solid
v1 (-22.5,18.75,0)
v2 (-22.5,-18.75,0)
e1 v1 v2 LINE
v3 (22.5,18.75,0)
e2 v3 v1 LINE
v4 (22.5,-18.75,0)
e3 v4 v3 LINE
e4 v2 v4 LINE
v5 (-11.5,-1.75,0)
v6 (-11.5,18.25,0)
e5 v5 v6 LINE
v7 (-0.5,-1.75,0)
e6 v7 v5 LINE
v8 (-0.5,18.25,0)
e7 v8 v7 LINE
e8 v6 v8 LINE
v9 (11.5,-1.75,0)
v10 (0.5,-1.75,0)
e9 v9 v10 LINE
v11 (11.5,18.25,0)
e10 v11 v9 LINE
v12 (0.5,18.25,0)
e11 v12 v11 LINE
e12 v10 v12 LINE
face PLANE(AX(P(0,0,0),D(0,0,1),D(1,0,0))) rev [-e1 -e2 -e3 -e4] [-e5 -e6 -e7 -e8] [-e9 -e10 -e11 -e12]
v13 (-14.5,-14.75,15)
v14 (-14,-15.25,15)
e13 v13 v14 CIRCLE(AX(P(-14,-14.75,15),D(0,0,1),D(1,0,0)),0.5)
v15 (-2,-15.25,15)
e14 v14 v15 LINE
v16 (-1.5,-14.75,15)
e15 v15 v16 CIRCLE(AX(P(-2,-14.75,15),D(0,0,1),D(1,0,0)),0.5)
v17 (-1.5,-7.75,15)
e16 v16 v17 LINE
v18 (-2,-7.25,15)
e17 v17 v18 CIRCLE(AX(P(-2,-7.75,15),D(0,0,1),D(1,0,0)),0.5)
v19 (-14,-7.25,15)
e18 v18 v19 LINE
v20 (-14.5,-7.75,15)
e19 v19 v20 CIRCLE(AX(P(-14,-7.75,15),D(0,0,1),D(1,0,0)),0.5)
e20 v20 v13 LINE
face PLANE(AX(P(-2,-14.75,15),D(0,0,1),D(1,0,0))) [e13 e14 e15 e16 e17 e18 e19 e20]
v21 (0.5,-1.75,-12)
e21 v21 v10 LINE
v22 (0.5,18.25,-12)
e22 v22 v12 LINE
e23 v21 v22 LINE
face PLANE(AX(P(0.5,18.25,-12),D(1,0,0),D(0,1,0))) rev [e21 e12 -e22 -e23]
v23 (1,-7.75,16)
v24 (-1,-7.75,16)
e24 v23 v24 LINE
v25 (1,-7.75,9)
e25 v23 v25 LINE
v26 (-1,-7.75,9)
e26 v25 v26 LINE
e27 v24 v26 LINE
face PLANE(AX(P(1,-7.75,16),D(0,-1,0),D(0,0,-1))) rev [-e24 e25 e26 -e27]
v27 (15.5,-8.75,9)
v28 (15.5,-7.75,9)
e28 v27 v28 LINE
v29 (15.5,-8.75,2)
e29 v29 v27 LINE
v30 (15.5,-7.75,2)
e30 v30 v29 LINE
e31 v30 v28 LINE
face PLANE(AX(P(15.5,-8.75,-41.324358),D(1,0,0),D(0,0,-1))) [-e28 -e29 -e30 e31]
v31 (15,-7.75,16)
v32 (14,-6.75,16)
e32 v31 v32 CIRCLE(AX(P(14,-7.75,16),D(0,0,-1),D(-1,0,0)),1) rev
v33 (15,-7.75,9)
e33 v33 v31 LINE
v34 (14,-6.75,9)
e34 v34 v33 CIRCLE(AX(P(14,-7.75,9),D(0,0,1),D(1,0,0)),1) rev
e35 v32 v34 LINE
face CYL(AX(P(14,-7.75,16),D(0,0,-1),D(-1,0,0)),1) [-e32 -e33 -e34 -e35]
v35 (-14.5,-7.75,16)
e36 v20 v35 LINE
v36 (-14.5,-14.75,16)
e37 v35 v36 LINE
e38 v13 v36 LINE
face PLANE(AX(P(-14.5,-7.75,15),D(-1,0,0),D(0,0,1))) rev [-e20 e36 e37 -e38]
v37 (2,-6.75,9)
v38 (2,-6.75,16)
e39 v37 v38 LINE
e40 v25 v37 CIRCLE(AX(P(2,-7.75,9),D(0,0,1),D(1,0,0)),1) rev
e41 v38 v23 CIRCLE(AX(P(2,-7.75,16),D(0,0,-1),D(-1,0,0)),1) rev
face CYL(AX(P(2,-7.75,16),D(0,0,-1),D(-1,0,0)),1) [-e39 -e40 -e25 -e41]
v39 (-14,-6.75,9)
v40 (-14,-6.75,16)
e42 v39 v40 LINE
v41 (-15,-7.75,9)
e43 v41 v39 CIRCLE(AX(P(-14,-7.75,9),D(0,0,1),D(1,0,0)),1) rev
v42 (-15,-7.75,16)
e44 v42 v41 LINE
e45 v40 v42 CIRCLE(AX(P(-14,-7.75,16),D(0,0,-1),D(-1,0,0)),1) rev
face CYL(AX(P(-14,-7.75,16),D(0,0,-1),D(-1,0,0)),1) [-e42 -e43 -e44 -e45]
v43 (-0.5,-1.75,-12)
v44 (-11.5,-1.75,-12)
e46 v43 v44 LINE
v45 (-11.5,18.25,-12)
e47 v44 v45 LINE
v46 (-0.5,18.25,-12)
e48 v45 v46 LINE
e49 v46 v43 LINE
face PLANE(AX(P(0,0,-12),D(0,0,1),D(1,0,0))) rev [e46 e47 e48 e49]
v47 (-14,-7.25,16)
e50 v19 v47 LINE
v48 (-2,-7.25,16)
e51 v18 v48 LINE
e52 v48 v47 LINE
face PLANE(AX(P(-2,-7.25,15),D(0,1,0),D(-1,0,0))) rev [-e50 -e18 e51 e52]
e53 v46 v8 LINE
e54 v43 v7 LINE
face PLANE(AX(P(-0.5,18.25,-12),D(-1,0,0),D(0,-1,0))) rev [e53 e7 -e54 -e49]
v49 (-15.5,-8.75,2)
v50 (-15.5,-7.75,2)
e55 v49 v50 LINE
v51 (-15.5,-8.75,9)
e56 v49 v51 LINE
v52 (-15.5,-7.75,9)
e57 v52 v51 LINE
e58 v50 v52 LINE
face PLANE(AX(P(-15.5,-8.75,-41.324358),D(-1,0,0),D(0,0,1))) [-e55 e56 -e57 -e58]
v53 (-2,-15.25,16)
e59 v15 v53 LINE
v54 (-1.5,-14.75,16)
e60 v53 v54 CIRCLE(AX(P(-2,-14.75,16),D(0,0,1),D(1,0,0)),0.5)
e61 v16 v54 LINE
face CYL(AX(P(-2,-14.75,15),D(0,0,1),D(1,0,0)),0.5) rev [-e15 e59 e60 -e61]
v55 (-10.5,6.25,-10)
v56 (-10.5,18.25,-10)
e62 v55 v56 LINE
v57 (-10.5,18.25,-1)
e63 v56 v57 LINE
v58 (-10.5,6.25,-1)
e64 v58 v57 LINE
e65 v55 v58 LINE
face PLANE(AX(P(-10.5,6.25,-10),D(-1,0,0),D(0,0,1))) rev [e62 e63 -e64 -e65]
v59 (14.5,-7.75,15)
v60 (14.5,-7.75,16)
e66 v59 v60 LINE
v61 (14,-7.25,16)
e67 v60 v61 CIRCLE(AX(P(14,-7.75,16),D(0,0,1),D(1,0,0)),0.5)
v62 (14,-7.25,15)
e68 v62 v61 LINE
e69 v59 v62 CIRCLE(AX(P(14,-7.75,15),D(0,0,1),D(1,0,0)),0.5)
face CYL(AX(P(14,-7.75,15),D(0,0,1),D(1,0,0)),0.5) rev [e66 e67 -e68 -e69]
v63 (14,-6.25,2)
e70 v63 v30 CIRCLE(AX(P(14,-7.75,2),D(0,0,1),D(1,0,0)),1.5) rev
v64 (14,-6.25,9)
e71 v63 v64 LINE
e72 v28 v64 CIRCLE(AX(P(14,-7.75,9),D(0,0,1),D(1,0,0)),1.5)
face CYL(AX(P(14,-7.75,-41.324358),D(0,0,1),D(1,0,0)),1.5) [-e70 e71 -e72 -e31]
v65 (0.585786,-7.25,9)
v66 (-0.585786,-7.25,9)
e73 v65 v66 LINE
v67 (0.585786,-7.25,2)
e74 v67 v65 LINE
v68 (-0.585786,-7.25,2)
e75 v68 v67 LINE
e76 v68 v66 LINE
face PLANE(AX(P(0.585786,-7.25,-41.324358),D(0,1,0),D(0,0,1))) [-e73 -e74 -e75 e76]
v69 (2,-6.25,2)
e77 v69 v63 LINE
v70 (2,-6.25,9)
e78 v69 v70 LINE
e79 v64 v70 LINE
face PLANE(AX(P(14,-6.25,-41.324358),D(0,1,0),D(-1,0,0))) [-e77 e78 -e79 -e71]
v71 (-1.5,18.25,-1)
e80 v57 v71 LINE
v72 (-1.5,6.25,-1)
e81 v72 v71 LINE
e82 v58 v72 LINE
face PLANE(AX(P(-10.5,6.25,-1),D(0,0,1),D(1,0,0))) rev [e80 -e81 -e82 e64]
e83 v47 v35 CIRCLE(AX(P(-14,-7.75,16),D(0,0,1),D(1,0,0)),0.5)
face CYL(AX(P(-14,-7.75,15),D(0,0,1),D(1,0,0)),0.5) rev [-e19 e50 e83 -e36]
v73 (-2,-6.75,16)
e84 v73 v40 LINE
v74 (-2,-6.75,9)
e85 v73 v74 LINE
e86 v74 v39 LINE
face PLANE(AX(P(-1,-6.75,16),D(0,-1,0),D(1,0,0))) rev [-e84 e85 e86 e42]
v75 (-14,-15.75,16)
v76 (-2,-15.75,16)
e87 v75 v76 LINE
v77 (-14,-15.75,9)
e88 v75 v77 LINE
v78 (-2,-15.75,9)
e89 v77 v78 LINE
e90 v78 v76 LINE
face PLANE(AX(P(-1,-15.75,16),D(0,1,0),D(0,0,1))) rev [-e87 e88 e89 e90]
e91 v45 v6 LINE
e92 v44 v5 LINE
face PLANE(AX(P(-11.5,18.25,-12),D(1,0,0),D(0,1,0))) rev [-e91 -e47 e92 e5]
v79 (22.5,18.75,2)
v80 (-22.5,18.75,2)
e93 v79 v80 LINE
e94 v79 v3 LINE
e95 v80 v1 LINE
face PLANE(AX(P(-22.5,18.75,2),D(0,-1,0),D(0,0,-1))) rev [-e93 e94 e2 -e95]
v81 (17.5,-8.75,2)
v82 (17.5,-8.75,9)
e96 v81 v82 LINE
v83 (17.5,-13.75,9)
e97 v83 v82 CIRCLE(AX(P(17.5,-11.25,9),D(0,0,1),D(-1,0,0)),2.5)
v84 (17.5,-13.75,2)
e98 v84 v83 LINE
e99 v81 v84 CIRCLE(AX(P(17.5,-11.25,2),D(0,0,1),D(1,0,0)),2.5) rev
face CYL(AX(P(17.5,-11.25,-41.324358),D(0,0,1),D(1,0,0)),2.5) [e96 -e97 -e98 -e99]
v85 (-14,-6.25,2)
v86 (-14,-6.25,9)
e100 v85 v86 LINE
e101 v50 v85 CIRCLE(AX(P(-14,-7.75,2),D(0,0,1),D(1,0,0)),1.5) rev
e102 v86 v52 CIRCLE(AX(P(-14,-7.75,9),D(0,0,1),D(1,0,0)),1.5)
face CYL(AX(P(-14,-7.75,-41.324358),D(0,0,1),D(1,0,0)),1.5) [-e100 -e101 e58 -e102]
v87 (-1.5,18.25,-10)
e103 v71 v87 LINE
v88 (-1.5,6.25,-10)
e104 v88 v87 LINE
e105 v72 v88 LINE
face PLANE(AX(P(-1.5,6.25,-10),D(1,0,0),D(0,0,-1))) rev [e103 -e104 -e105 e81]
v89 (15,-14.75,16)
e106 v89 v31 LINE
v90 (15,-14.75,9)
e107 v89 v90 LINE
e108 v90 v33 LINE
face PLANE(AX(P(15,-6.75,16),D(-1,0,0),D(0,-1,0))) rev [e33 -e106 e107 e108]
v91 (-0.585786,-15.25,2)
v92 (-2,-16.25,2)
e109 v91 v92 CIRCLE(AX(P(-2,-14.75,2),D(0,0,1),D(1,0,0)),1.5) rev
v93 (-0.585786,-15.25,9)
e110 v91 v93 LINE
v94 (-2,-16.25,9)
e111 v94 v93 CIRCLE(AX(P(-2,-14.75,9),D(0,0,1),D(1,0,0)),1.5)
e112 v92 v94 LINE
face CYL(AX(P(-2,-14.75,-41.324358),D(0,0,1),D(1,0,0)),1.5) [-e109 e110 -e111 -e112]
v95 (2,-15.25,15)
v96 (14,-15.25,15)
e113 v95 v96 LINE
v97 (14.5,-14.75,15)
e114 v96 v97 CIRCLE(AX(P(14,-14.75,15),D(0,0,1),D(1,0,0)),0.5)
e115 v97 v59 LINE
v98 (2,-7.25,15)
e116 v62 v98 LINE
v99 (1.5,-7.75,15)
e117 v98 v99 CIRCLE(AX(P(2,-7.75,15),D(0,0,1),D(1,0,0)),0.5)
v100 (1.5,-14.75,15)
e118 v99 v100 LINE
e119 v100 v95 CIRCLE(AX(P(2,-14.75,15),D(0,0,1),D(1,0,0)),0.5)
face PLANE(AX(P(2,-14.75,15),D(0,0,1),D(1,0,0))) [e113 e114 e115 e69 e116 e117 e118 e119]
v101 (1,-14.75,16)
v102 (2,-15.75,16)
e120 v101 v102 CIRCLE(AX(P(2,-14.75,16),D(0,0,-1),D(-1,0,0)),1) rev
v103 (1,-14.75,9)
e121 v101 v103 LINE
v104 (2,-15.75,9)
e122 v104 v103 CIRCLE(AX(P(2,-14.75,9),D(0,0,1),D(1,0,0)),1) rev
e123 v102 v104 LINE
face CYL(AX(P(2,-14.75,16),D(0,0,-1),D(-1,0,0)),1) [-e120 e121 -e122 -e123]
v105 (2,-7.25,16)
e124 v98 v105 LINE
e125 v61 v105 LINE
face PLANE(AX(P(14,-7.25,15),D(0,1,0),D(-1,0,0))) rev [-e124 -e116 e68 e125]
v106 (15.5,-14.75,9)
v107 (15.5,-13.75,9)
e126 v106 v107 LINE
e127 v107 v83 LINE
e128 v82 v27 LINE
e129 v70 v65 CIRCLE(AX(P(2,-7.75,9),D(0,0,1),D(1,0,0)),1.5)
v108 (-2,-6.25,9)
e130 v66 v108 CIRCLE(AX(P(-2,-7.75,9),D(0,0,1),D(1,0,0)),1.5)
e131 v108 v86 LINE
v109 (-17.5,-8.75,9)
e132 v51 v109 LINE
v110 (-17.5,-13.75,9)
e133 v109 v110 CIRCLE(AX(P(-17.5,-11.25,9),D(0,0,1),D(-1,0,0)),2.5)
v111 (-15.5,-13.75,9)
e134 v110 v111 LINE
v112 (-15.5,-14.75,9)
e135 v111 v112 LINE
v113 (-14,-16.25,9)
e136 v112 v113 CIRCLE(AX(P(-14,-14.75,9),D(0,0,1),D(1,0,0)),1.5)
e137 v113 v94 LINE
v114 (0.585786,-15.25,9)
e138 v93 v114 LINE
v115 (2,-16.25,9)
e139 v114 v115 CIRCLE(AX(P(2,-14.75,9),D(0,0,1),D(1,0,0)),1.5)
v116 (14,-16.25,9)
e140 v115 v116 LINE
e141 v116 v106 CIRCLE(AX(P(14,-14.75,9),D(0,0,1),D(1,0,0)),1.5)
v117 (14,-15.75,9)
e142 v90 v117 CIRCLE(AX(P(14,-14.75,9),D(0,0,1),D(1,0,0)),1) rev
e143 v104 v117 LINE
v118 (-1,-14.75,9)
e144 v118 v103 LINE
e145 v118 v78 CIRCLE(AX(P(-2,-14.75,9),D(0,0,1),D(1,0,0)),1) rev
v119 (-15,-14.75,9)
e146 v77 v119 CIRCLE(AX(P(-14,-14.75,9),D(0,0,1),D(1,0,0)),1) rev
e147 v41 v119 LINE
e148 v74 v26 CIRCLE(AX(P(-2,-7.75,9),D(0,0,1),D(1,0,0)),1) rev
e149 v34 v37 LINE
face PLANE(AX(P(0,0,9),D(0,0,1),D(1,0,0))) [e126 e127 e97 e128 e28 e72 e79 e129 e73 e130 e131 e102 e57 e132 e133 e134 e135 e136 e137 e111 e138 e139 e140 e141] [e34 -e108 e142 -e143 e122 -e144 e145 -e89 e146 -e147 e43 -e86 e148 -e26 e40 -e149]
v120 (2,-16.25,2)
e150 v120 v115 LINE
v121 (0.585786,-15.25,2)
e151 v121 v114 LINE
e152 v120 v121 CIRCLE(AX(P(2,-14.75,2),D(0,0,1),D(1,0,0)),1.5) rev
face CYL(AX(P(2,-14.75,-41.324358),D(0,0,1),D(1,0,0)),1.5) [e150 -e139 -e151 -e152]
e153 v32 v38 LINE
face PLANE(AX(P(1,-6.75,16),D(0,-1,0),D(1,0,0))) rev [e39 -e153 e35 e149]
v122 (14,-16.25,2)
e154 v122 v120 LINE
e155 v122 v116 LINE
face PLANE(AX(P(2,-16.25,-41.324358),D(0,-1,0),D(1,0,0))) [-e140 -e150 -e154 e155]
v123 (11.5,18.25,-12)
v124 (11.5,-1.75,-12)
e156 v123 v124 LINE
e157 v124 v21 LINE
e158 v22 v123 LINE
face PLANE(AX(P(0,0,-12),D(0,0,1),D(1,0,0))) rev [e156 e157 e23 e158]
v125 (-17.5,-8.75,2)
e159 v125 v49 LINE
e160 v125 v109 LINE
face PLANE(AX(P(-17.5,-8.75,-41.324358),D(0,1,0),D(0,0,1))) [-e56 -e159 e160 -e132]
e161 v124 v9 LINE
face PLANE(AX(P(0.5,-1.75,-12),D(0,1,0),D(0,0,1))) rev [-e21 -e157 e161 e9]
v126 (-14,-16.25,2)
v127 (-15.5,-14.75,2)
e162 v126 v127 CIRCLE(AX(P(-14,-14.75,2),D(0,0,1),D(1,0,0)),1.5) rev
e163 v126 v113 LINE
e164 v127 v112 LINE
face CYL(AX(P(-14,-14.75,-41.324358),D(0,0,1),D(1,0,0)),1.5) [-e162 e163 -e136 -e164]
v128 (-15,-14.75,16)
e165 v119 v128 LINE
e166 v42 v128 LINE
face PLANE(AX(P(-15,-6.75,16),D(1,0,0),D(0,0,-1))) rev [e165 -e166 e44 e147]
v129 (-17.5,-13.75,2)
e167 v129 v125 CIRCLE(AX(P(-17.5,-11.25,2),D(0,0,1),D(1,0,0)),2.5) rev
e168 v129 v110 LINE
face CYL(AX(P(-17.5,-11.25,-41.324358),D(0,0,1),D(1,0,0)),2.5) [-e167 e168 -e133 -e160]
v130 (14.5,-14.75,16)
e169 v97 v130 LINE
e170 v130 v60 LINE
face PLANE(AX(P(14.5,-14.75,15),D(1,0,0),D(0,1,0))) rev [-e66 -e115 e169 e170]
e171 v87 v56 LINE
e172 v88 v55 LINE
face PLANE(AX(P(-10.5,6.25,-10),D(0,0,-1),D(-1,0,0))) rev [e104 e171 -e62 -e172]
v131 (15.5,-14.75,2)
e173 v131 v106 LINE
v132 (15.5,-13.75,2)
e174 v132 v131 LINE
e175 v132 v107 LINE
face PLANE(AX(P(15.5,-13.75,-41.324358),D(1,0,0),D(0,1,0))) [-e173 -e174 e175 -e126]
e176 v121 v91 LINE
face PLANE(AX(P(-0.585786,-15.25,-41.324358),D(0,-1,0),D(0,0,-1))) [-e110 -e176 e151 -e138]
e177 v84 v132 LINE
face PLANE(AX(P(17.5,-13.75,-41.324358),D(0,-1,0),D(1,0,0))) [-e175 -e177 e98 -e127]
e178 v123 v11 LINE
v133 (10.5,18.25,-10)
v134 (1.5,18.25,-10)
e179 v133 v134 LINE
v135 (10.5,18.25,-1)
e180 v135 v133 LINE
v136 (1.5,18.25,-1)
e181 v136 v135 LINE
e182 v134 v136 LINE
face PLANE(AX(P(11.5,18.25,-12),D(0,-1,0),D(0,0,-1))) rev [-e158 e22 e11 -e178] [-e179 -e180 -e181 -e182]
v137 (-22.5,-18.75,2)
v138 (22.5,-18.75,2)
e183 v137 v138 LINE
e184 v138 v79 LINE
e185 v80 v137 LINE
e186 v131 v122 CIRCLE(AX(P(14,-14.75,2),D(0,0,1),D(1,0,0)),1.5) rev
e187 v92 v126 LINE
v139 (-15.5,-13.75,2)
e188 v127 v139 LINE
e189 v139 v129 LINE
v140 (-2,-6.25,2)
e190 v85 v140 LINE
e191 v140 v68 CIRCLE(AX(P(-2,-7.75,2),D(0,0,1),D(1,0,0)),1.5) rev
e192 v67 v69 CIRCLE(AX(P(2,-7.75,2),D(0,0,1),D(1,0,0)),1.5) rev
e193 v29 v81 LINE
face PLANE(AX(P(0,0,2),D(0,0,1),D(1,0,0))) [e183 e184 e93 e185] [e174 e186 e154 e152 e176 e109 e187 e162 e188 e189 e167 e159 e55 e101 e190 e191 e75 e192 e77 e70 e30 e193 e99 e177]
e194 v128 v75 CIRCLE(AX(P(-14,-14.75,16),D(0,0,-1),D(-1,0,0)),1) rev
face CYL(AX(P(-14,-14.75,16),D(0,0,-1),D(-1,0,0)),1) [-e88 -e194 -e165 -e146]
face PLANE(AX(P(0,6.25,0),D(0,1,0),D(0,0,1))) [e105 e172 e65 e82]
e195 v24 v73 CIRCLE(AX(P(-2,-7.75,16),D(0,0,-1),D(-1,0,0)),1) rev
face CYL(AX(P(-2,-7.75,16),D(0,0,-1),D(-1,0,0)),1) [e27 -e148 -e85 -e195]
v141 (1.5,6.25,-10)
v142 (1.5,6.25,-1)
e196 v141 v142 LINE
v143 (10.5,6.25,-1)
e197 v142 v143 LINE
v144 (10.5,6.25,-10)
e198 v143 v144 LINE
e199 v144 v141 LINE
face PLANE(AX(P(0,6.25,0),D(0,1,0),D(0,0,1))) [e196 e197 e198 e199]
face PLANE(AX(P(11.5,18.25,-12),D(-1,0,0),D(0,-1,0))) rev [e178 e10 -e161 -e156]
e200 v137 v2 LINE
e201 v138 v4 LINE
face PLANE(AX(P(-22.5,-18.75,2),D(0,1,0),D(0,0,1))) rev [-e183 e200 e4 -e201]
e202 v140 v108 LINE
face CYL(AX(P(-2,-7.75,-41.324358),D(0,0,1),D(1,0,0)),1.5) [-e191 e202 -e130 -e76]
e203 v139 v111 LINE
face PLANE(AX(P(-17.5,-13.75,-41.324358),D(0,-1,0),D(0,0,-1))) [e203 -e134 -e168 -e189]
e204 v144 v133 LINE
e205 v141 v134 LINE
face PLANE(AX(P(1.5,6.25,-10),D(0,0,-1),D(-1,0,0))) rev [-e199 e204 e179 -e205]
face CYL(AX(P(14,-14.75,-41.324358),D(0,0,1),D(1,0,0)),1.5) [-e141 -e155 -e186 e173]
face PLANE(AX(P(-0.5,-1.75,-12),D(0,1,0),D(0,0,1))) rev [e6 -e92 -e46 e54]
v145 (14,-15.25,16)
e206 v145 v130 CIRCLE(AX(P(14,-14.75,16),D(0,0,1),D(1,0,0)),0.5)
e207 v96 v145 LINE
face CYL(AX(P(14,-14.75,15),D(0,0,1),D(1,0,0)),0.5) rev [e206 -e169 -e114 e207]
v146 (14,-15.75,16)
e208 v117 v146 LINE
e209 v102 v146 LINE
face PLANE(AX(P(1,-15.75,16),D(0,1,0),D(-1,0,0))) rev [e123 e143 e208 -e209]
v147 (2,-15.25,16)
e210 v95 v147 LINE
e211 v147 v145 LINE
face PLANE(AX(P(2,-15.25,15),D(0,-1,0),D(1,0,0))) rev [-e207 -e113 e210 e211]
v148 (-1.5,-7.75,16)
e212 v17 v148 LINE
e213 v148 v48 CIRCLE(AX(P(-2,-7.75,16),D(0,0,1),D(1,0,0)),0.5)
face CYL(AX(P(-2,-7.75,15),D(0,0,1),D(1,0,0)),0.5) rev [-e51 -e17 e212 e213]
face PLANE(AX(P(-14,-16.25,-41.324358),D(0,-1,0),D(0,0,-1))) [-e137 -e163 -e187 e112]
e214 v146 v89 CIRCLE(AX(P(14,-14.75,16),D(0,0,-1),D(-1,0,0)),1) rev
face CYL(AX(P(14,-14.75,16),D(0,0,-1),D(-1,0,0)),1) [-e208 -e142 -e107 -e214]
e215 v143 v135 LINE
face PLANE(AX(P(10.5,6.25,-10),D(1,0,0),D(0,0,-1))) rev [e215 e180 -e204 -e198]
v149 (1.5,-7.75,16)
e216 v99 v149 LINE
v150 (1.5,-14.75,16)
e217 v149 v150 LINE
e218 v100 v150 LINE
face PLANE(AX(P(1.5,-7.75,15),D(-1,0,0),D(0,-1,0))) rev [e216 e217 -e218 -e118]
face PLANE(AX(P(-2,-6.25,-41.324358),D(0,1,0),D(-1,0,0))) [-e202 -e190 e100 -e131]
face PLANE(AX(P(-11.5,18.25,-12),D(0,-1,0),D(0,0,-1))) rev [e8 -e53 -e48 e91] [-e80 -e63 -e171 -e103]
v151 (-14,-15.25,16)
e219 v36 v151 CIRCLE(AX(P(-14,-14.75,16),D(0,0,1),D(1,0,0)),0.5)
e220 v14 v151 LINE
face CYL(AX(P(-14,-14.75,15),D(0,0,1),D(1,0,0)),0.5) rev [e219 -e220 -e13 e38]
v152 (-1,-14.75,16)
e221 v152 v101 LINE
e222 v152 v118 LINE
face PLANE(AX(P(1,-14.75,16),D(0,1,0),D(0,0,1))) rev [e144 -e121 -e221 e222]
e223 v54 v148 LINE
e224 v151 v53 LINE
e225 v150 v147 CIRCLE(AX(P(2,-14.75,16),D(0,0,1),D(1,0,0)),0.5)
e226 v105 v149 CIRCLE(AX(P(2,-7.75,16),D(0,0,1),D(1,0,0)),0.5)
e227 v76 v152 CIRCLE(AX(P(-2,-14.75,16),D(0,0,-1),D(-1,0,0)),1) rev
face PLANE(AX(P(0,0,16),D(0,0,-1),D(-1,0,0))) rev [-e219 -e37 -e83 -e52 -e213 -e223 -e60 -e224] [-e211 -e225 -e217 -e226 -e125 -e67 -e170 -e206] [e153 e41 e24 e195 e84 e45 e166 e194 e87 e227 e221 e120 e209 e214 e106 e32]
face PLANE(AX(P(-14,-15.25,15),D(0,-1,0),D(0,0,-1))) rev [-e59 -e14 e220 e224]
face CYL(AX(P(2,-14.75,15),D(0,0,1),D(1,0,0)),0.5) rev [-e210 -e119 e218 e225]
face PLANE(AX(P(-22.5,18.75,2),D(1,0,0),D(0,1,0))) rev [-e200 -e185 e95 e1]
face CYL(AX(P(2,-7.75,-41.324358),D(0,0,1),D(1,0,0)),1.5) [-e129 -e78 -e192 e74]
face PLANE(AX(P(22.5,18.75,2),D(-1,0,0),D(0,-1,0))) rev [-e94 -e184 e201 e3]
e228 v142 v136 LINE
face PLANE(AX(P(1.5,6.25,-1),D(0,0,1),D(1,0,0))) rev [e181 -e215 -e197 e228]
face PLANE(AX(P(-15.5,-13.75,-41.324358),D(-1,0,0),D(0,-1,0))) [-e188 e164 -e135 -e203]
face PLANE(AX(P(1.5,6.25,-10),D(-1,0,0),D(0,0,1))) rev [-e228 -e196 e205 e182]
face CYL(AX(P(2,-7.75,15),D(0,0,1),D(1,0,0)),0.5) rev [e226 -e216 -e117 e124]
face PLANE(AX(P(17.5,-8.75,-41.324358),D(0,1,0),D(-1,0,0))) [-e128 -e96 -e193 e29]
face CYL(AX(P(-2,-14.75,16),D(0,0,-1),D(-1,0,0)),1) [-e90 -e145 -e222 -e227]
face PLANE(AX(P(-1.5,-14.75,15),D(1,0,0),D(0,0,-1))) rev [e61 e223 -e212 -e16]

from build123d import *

# Parameters (mm, degrees)
SKETCH1_W           = 45
SKETCH1_H           = 37.5
BOSS_EXTRUDE1_DEPTH = 2
SKETCH2_W           = 40
SKETCH2_H           = 13
BOSS_EXTRUDE2_DEPTH = 7
BOSS_EXTRUDE3_DEPTH = 7
FILLET1_R           = 1
CUT_EXTRUDE1_DEPTH  = 1
SKETCH5_W           = 41
SKETCH5_H           = 14
CUT_EXTRUDE2_DEPTH  = 7
SKETCH6_W           = 11
SKETCH6_H           = 20
BOSS_EXTRUDE5_DEPTH = 12
SKETCH7_W           = 9
SKETCH7_H           = 9
CUT_EXTRUDE3_DEPTH  = 12


with BuildPart() as part:
    # Sketch1 → Boss-Extrude1 (new body)
    with BuildSketch(Plane.XY):
        Rectangle(SKETCH1_W, SKETCH1_H)
    extrude(amount=BOSS_EXTRUDE1_DEPTH)

    # Sketch2 → Boss-Extrude2 (add)
    with BuildSketch(Plane.XY.offset(2)):
        with Locations((0, -11.25)):
            Rectangle(SKETCH2_W, SKETCH2_H)
    extrude(amount=BOSS_EXTRUDE2_DEPTH)

    # Sketch3 → Boss-Extrude3 (add)
    with BuildSketch(Plane.XY.offset(9)):
        Polygon((-1, -7.75), (-1, -6.75), (-15, -6.75), (-15, -15.75), (-1, -15.75), (-1, -14.75), (1, -14.75), (1, -15.75), (15, -15.75), (15, -6.75), (1, -6.75), (1, -7.75), align=None)
    extrude(amount=BOSS_EXTRUDE3_DEPTH)

    # Fillet1
    fillet1_edges = [part.edges().sort_by_distance(p)[0] for p in [
        (-15, -15.75, 12.5),
        (-1, -15.75, 12.5),
        (1, -15.75, 12.5),
        (-15, -6.75, 12.5),
        (15, -15.75, 12.5),
        (15, -6.75, 12.5),
        (1, -6.75, 12.5),
        (-1, -6.75, 12.5),
    ]]
    fillet(fillet1_edges, radius=FILLET1_R - 0.0001)  # a hair under: the kernel refuses the full size

    # Sketch4 → Cut-Extrude1 (cut)
    with BuildSketch(Plane.XY.offset(16)):
        with BuildLine():
            Line((-1.5, -14.75), (-1.5, -7.75))
            ThreePointArc((-1.5, -7.75), (-1.646446609, -7.396446609), (-2, -7.25))
            Line((-2, -7.25), (-14, -7.25))
            ThreePointArc((-14, -7.25), (-14.353553391, -7.396446609), (-14.5, -7.75))
            Line((-14.5, -7.75), (-14.5, -14.75))
            ThreePointArc((-14.5, -14.75), (-14.353553391, -15.103553391), (-14, -15.25))
            Line((-14, -15.25), (-2, -15.25))
            ThreePointArc((-2, -15.25), (-1.646446609, -15.103553391), (-1.5, -14.75))
        make_face()
        with BuildLine():
            Line((1.5, -7.75), (1.5, -14.75))
            ThreePointArc((1.5, -14.75), (1.646446609, -15.103553391), (2, -15.25))
            Line((2, -15.25), (14, -15.25))
            ThreePointArc((14, -15.25), (14.353553391, -15.103553391), (14.5, -14.75))
            Line((14.5, -14.75), (14.5, -7.75))
            ThreePointArc((14.5, -7.75), (14.353553391, -7.396446609), (14, -7.25))
            Line((14, -7.25), (2, -7.25))
            ThreePointArc((2, -7.25), (1.646446609, -7.396446609), (1.5, -7.75))
        make_face()
    extrude(amount=-CUT_EXTRUDE1_DEPTH, mode=Mode.SUBTRACT)

    # Sketch5 → Cut-Extrude2 (cut)
    with BuildSketch(Plane.XY.offset(9)):
        with Locations((0, -11.25)):
            Rectangle(SKETCH5_W, SKETCH5_H)
        with BuildLine():
            Line((-17.5, -8.75), (-15.5, -8.75))
            Line((-15.5, -8.75), (-15.5, -7.75))
            ThreePointArc((-15.5, -7.75), (-15.060660172, -6.689339828), (-14, -6.25))
            Line((-14, -6.25), (-2, -6.25))
            ThreePointArc((-2, -6.25), (-1.133974596, -6.525255129), (-0.585786438, -7.25))
            Line((-0.585786438, -7.25), (0.585786438, -7.25))
            ThreePointArc((0.585786438, -7.25), (1.133974596, -6.525255129), (2, -6.25))
            Line((2, -6.25), (14, -6.25))
            ThreePointArc((14, -6.25), (15.060660172, -6.689339828), (15.5, -7.75))
            Line((15.5, -7.75), (15.5, -8.75))
            Line((15.5, -8.75), (17.5, -8.75))
            ThreePointArc((17.5, -8.75), (20, -11.25), (17.5, -13.75))
            Line((17.5, -13.75), (15.5, -13.75))
            Line((15.5, -13.75), (15.5, -14.75))
            ThreePointArc((15.5, -14.75), (15.060660172, -15.810660172), (14, -16.25))
            Line((14, -16.25), (2, -16.25))
            ThreePointArc((2, -16.25), (1.133974596, -15.974744871), (0.585786438, -15.25))
            Line((0.585786438, -15.25), (-0.585786438, -15.25))
            ThreePointArc((-0.585786438, -15.25), (-1.133974596, -15.974744871), (-2, -16.25))
            Line((-2, -16.25), (-14, -16.25))
            ThreePointArc((-14, -16.25), (-15.060660172, -15.810660172), (-15.5, -14.75))
            Line((-15.5, -14.75), (-15.5, -13.75))
            Line((-15.5, -13.75), (-17.5, -13.75))
            ThreePointArc((-17.5, -13.75), (-20, -11.25), (-17.5, -8.75))
        make_face(mode=Mode.SUBTRACT)
    extrude(amount=-CUT_EXTRUDE2_DEPTH, mode=Mode.SUBTRACT)

    # Sketch6 → Boss-Extrude5 (add)
    with BuildSketch(Plane(origin=(0, 0, 0), x_dir=(-1, 0, 0), z_dir=(0, 0, -1))):
        with Locations((-6, 8.25)):
            Rectangle(SKETCH6_W, SKETCH6_H)
        with Locations((6, 8.25)):
            Rectangle(SKETCH6_W, SKETCH6_H)
    extrude(amount=BOSS_EXTRUDE5_DEPTH)

    # Sketch7 → Cut-Extrude3 (cut)
    with BuildSketch(Plane(origin=(0, 18.25, 0), x_dir=(1, 0, 0), z_dir=(0, 1, 0))):
        with Locations((-6, 5.5)):
            Rectangle(SKETCH7_W, SKETCH7_H)
        with Locations((6, 5.5)):
            Rectangle(SKETCH7_W, SKETCH7_H)
    extrude(amount=-CUT_EXTRUDE3_DEPTH, mode=Mode.SUBTRACT)


solid = part.part
